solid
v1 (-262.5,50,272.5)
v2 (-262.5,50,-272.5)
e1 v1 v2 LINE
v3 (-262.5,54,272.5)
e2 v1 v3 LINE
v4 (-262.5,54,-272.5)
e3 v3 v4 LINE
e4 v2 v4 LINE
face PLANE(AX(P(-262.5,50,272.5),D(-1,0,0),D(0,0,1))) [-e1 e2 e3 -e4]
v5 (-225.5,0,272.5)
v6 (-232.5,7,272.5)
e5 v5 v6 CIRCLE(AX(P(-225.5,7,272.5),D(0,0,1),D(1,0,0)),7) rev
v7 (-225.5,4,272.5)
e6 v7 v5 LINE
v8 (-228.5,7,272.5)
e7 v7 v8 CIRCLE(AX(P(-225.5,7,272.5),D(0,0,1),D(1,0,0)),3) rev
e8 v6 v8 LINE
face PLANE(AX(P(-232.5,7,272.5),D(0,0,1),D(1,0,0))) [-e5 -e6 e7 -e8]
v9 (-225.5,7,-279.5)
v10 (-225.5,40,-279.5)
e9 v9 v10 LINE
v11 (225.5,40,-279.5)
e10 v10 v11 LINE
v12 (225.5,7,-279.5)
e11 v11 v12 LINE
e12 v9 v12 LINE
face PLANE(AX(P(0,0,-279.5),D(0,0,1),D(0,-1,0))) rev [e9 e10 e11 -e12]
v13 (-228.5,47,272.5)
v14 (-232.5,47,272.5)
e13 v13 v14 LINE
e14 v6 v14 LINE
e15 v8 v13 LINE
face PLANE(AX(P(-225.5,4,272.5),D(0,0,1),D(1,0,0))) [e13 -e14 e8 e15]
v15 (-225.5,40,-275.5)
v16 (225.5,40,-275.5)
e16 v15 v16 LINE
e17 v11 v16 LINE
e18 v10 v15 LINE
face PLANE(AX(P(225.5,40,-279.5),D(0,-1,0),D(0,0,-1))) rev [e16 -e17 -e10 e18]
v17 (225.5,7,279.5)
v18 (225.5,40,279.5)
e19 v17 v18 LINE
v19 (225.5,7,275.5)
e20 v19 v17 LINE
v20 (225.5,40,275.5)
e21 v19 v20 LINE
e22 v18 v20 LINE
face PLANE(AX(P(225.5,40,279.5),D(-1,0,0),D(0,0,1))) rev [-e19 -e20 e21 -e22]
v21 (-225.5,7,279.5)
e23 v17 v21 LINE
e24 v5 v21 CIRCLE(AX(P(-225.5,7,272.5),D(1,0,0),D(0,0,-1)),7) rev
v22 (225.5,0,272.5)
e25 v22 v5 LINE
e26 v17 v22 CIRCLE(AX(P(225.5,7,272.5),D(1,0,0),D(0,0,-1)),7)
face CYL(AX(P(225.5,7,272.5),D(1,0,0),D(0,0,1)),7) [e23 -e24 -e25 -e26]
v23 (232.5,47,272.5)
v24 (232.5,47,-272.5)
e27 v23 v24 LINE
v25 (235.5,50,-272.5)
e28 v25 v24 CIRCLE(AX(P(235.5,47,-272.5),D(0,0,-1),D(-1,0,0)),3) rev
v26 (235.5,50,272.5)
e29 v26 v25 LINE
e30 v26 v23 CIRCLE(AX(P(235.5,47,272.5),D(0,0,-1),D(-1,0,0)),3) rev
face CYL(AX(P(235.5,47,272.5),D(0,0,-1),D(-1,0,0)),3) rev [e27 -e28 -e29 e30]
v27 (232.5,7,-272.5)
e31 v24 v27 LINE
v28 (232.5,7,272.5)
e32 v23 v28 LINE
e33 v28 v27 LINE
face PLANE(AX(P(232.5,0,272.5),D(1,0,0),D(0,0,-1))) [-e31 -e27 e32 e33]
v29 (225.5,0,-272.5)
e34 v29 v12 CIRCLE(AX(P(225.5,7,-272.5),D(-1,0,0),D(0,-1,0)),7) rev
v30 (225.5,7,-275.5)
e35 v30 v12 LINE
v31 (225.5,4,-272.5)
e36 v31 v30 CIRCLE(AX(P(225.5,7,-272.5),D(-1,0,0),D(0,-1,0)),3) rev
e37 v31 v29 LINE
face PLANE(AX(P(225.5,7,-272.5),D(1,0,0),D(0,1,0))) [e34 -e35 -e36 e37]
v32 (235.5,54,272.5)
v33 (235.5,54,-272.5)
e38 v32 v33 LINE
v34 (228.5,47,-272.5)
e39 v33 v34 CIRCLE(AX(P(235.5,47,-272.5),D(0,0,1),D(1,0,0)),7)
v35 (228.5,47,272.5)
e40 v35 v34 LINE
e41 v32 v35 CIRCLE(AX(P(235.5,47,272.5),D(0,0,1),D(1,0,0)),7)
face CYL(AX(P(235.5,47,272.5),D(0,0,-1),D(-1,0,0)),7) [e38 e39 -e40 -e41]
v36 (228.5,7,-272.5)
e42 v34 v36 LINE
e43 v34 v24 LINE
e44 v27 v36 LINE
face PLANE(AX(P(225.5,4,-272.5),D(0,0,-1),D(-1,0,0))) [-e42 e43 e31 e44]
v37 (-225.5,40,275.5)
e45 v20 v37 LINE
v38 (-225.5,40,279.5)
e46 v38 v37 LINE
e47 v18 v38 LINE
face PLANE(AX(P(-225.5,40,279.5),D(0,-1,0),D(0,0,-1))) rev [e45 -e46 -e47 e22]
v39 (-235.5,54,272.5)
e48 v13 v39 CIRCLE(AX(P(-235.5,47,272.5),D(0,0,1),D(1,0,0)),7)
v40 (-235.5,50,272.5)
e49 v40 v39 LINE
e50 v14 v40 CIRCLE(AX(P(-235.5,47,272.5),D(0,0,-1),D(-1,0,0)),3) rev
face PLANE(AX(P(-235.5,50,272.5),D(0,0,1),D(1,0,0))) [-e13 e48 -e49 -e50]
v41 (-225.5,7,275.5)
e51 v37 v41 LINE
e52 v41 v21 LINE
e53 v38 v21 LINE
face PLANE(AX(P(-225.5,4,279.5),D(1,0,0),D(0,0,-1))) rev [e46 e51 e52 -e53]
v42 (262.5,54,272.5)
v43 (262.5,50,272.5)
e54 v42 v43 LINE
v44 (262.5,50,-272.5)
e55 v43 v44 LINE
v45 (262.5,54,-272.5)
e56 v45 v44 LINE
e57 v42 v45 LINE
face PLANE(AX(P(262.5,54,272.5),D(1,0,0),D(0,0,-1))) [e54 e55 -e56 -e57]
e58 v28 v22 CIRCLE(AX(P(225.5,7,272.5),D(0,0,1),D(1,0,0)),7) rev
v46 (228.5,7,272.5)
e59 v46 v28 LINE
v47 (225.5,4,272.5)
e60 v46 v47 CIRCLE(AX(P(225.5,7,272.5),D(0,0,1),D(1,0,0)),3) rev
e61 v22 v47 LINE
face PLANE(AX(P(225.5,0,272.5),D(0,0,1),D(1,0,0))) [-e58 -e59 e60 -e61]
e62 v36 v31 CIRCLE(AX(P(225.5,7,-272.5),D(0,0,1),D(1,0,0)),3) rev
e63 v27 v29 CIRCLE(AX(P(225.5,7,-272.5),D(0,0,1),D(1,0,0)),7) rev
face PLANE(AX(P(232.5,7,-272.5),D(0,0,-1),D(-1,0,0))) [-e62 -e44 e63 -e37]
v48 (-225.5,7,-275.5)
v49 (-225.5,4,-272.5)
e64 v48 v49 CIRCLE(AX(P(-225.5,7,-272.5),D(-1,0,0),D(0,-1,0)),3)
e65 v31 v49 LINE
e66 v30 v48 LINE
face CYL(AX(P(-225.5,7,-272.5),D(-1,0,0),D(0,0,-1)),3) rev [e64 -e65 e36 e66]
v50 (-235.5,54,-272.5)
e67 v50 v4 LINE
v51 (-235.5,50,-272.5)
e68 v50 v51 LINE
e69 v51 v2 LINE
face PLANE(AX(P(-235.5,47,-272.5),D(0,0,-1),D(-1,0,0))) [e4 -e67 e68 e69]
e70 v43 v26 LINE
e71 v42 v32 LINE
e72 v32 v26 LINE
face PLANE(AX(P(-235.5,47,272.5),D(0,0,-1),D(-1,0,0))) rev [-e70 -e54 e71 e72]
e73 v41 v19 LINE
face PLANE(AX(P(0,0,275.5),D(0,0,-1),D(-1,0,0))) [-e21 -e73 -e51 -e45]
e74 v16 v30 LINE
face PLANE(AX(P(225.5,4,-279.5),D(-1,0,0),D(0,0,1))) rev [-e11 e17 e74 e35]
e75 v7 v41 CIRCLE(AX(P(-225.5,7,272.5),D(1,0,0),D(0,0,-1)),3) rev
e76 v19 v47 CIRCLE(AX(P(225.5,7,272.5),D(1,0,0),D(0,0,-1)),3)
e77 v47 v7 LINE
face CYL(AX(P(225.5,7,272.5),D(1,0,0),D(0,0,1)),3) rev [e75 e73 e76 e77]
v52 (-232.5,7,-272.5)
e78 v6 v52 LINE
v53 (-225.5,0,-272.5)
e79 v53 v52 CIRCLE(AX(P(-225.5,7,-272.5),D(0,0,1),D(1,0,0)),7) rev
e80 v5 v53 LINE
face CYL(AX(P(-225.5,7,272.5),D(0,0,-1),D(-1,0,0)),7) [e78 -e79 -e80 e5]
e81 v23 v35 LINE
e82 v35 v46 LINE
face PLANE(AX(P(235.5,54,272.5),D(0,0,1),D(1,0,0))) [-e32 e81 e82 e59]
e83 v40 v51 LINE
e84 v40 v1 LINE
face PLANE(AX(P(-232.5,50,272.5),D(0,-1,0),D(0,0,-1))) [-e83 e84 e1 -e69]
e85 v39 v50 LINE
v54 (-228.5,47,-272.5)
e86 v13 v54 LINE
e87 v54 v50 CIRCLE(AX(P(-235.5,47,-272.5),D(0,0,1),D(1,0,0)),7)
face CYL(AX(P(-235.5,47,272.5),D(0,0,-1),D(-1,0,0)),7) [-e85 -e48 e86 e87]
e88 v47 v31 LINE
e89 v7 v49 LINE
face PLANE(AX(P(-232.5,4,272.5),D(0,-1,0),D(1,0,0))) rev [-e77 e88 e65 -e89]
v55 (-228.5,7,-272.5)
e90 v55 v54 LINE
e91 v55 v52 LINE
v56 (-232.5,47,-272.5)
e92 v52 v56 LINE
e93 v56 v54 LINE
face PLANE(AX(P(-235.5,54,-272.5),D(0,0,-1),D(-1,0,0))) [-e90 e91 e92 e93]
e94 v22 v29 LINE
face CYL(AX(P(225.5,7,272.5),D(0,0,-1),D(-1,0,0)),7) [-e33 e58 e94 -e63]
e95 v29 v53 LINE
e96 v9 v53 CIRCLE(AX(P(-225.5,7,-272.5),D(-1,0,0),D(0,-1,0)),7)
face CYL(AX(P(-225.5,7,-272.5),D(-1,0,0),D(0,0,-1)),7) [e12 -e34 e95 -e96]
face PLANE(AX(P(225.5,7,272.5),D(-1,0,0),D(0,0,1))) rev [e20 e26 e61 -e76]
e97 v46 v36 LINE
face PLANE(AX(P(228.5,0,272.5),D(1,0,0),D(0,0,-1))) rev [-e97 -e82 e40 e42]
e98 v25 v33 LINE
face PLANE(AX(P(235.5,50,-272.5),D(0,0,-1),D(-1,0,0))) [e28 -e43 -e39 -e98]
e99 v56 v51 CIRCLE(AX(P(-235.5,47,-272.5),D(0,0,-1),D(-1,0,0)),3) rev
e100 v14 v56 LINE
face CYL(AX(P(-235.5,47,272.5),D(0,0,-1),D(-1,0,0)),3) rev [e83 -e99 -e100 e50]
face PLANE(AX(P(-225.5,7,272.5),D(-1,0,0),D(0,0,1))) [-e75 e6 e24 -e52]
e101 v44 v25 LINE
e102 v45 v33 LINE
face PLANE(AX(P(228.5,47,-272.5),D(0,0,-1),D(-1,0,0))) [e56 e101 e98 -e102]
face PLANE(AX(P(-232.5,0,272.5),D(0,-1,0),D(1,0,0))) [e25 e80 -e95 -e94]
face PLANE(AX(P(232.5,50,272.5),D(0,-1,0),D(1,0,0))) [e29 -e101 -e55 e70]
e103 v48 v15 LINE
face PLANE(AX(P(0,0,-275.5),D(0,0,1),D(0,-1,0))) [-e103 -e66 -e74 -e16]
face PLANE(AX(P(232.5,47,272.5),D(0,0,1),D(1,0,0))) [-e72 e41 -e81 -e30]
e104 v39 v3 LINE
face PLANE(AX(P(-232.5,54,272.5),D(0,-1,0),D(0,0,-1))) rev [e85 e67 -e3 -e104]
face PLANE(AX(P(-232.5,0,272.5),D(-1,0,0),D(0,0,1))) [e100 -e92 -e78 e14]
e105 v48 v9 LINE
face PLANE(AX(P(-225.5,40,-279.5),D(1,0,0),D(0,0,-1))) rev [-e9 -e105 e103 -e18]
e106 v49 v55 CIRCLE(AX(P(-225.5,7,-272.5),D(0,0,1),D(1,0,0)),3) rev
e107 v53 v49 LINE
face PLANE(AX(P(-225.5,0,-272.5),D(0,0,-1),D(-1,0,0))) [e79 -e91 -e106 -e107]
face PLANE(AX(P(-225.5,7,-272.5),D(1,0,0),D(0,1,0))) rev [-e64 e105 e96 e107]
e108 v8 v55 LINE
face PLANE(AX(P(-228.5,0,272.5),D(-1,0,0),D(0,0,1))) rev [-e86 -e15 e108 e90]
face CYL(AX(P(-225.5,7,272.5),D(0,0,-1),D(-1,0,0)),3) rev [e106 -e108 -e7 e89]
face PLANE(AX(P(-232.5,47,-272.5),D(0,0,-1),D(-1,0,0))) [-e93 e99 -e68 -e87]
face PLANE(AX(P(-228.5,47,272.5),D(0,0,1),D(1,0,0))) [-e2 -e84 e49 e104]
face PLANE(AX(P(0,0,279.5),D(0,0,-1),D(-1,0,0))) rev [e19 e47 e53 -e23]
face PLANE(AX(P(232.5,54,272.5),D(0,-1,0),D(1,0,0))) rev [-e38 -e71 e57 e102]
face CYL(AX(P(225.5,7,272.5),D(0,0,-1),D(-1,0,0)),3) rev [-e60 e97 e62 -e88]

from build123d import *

# Parameters (mm, degrees)
BASE_FLANGIA1_DEPTH       = 272.5
BORDO_FLANGIA1_DEPTH      = 451
BORDO_FLANGIA1_BEND_DEPTH = 451


# Sheet-metal steps are written as plain solids
with BuildPart() as part:
    # Schizzo1 → Base-Flangia1 (new, symmetric)
    with BuildSketch(Plane.XY):
        with BuildLine():
            Line((-262.5, 50), (-235.5, 50))
            ThreePointArc((-235.5, 50), (-233.378679656, 49.121320344), (-232.5, 47))
            Line((-232.5, 47), (-232.5, 7))
            ThreePointArc((-232.5, 7), (-230.449747468, 2.050252532), (-225.5, 0))
            Line((-225.5, 0), (225.5, 0))
            ThreePointArc((225.5, 0), (230.449747468, 2.050252532), (232.5, 7))
            Line((232.5, 7), (232.5, 47))
            ThreePointArc((232.5, 47), (233.378679656, 49.121320344), (235.5, 50))
            Line((235.5, 50), (262.5, 50))
            Line((262.5, 50), (262.5, 54))
            Line((262.5, 54), (235.5, 54))
            ThreePointArc((235.5, 54), (230.550252532, 51.949747468), (228.5, 47))
            Line((228.5, 47), (228.5, 7))
            ThreePointArc((228.5, 7), (227.621320344, 4.878679656), (225.5, 4))
            Line((225.5, 4), (-225.5, 4))
            ThreePointArc((-225.5, 4), (-227.621320344, 4.878679656), (-228.5, 7))
            Line((-228.5, 7), (-228.5, 47))
            ThreePointArc((-228.5, 47), (-230.550252532, 51.949747468), (-235.5, 54))
            Line((-235.5, 54), (-262.5, 54))
            Line((-262.5, 54), (-262.5, 50))
        make_face()
    extrude(amount=BASE_FLANGIA1_DEPTH, both=True)

    # Bordo-Flangia1 section (across the edge) → Bordo-Flangia1 (add)
    with BuildSketch(Plane(origin=(-225.5, 4, 275.5), x_dir=(0, 0, -1), z_dir=(1, 0, 0))):
        with BuildLine():
            Line((-4, 3), (-4, 36))
            Line((-4, 36), (0, 36))
            Line((0, 36), (0, 3))
            ThreePointArc((0, 3), (0.878679656, 0.878679656), (3, 0))
            Line((3, 0), (3, -4))
            ThreePointArc((3, -4), (-1.949747468, -1.949747468), (-4, 3))
        make_face()
    extrude(amount=BORDO_FLANGIA1_DEPTH)

    # Bordo-Flangia1 section 2 (across the edge) → Bordo-Flangia1 bend (add)
    with BuildSketch(Plane(origin=(225.5, 4, -275.5), x_dir=(0, 0, 1), z_dir=(-1, 0, 0))):
        with BuildLine():
            Line((-4, 3), (-4, 36))
            Line((-4, 36), (0, 36))
            Line((0, 36), (0, 3))
            ThreePointArc((0, 3), (0.878679656, 0.878679656), (3, 0))
            Line((3, 0), (3, -4))
            ThreePointArc((3, -4), (-1.949747468, -1.949747468), (-4, 3))
        make_face()
    extrude(amount=BORDO_FLANGIA1_BEND_DEPTH)


solid = part.part
